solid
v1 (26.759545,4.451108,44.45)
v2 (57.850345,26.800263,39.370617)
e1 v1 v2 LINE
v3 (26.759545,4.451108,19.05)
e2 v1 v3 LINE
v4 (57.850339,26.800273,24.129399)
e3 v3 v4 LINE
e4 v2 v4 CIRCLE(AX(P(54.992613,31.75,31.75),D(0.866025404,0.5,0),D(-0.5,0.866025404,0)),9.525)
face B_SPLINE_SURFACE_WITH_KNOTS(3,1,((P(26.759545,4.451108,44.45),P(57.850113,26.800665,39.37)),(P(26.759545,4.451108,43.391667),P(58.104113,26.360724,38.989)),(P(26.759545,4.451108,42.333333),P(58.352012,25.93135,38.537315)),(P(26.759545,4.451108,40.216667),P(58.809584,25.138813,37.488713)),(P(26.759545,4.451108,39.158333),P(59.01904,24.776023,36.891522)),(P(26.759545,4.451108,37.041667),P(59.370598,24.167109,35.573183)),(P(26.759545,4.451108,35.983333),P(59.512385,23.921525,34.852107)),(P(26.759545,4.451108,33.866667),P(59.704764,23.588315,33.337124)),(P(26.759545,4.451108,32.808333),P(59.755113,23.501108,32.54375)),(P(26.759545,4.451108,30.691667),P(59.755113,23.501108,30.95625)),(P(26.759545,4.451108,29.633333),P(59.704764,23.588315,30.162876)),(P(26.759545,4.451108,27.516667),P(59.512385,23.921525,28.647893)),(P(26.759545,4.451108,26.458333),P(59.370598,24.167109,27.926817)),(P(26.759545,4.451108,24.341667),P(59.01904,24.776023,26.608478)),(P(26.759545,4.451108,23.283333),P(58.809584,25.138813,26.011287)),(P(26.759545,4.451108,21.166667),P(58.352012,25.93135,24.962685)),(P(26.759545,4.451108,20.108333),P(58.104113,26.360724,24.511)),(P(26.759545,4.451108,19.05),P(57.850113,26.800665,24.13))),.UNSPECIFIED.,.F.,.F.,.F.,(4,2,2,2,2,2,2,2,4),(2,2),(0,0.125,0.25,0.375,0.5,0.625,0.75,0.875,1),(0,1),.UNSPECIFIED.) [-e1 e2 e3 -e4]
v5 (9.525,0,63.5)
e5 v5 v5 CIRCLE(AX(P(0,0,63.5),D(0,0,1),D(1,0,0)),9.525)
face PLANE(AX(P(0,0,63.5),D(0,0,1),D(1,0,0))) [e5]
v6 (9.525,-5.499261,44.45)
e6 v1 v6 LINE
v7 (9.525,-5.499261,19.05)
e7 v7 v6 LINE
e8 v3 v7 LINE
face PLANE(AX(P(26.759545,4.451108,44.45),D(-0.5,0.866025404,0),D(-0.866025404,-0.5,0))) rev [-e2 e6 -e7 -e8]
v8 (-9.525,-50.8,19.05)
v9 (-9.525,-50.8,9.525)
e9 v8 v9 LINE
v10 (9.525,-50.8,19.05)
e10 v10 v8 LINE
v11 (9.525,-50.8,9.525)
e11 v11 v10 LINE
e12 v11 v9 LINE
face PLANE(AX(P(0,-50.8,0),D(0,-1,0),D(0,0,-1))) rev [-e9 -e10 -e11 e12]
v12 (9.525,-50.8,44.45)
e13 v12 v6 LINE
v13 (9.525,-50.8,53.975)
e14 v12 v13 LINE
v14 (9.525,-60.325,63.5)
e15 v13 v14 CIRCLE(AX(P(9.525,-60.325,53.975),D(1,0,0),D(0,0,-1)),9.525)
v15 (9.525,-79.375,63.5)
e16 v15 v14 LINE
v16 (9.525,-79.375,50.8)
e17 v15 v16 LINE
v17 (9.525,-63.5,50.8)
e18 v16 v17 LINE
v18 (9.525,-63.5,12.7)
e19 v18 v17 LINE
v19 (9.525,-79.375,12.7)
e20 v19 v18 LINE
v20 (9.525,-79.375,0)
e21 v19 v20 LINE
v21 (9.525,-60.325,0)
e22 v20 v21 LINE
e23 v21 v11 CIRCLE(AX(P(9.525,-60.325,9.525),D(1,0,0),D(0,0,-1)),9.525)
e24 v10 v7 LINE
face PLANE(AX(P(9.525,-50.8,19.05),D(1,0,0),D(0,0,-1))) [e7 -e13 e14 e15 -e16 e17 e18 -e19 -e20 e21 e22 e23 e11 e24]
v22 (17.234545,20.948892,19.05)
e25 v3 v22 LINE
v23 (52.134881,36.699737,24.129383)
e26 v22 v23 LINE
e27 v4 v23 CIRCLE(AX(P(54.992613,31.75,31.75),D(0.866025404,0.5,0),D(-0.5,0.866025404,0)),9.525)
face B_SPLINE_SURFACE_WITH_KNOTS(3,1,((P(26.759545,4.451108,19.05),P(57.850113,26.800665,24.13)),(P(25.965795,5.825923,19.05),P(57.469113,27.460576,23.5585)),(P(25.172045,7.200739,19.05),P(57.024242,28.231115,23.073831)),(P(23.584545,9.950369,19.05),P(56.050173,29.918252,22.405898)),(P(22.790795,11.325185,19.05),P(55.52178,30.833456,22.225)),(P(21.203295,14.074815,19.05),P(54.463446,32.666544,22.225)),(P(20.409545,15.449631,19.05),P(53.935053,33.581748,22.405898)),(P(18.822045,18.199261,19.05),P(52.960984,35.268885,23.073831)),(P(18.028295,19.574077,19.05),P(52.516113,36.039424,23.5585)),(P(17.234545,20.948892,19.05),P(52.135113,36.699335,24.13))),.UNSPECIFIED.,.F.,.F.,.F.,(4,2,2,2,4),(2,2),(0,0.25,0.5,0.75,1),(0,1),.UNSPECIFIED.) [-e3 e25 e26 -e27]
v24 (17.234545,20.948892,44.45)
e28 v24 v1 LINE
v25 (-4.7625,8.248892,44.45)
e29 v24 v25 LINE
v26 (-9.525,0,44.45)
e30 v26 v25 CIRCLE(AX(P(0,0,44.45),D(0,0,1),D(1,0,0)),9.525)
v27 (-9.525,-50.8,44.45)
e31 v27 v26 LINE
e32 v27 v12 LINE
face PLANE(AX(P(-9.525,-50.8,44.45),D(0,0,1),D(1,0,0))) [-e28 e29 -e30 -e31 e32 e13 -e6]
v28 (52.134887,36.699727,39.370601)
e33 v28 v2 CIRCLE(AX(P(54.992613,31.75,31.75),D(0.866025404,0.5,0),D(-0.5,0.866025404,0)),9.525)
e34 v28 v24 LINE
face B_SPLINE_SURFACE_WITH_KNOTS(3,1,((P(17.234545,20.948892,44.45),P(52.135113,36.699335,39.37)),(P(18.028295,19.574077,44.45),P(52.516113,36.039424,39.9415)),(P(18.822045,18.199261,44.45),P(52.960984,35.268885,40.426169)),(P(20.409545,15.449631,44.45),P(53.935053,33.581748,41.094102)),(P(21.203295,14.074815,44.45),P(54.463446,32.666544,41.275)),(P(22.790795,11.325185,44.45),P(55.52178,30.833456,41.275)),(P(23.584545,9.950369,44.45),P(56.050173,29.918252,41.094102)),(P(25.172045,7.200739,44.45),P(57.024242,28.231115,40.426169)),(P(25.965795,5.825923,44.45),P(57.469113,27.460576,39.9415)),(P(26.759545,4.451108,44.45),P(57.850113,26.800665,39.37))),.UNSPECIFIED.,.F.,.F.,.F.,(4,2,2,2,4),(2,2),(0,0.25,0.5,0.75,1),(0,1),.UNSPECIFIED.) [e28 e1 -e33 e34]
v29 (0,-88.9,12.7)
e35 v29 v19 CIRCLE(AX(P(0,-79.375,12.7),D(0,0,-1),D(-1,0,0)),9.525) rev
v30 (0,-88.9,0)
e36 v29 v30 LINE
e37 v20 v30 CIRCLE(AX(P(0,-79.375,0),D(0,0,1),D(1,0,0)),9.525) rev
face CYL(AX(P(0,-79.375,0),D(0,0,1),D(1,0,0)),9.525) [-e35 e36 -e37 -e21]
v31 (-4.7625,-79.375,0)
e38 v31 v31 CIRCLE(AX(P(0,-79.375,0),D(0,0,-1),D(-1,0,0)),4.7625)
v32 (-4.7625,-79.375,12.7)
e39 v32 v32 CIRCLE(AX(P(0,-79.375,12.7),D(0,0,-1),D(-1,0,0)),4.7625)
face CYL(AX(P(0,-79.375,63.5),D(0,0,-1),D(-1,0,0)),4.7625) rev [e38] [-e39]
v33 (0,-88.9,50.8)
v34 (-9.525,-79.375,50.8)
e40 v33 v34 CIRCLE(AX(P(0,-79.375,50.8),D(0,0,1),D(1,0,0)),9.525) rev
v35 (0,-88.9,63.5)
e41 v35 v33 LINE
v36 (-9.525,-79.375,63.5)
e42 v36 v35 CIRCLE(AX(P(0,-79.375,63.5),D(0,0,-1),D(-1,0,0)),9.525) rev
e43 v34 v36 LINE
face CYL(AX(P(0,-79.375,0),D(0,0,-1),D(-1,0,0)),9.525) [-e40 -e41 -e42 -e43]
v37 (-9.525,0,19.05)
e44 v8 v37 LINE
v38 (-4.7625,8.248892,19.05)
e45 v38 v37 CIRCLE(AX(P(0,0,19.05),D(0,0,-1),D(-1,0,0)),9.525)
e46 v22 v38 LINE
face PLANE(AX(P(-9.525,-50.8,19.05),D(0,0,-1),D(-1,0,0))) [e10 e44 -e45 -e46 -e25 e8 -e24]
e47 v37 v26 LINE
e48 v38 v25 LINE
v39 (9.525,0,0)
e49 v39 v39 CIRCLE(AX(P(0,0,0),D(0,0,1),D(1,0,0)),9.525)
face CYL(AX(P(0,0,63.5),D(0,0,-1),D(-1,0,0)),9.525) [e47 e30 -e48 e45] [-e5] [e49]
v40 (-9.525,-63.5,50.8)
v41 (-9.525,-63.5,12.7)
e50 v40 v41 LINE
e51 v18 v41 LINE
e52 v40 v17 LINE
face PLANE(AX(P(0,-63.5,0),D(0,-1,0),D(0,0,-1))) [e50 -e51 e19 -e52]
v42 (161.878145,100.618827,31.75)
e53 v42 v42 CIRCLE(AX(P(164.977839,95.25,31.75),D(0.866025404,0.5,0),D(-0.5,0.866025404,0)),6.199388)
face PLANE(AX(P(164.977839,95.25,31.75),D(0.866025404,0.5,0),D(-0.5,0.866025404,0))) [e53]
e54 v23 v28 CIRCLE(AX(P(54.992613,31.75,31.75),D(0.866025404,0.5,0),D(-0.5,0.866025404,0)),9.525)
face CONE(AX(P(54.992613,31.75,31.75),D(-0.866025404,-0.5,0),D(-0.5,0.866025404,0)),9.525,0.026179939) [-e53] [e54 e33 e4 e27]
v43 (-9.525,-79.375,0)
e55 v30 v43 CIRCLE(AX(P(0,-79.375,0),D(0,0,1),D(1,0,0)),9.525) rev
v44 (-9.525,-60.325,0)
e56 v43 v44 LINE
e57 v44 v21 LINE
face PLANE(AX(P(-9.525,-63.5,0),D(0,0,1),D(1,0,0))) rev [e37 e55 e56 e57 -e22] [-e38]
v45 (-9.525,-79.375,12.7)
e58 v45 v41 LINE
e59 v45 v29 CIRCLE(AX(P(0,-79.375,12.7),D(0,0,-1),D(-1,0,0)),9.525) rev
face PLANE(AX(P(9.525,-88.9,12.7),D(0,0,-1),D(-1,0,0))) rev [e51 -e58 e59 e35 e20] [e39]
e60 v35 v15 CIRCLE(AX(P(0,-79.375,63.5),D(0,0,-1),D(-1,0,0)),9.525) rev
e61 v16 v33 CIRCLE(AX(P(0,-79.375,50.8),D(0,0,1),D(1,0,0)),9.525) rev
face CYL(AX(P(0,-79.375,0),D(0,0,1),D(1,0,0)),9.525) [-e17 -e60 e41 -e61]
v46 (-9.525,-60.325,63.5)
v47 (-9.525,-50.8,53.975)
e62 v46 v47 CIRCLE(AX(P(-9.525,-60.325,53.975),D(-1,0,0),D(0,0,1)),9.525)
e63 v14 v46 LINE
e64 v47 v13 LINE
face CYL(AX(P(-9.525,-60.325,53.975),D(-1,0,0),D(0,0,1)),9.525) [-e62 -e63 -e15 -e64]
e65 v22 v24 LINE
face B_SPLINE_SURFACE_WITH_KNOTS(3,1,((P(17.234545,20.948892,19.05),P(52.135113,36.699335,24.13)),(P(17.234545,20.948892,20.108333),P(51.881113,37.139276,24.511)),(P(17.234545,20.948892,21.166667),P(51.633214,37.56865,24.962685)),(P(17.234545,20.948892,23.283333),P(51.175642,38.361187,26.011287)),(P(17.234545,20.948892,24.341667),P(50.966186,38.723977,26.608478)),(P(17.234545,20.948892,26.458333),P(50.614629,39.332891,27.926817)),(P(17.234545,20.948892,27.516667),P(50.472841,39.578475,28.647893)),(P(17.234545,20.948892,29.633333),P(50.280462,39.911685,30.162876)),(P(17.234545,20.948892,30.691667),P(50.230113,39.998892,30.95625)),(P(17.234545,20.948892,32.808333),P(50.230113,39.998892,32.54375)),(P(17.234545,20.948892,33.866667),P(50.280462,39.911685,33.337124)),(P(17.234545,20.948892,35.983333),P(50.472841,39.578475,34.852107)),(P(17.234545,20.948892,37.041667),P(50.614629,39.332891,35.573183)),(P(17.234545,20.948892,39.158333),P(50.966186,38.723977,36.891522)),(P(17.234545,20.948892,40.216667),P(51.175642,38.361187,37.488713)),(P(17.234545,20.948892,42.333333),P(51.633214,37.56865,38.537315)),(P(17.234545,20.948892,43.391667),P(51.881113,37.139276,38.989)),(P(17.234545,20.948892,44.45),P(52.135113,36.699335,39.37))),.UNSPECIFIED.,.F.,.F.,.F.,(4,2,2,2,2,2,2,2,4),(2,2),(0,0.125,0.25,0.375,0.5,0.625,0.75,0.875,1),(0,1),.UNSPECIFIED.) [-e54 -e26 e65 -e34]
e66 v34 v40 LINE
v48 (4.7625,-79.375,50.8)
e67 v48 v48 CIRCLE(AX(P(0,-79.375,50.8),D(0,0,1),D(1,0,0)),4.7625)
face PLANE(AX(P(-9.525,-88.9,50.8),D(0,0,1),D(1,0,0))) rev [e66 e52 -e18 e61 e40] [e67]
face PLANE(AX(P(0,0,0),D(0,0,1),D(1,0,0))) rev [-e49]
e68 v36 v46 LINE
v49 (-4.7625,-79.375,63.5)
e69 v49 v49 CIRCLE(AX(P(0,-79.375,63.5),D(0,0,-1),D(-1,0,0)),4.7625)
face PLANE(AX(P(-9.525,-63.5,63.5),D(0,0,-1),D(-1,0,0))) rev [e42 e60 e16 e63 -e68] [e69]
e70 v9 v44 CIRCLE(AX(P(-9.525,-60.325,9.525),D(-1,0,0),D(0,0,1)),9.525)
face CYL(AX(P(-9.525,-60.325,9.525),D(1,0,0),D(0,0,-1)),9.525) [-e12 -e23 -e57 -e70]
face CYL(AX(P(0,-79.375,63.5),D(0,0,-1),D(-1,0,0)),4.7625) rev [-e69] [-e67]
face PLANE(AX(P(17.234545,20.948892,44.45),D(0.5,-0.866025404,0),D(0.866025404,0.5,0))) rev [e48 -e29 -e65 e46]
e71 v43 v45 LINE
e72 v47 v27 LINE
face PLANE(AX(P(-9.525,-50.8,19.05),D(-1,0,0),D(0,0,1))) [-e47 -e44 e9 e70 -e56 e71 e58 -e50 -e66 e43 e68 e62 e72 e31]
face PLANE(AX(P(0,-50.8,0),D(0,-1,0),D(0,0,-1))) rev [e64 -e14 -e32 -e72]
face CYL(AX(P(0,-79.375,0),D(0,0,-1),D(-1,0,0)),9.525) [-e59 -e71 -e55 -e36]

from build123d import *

# Parameters (mm, degrees)
SKETCH2_R           = 9.525
BOSS_EXTRUDE1_DEPTH = 63.5
SKETCH3_W           = 19.05
SKETCH3_H           = 25.4
BOSS_EXTRUDE2_DEPTH = 50.8
SKETCH4_W           = 25.4
SKETCH4_H           = 19.05
BOSS_EXTRUDE3_DEPTH = 25.4
SKETCH5_2_R         = 9.525
BOSS_EXTRUDE4_DEPTH = 127
BOSS_EXTRUDE4_TAPER = 1.5
SKETCH8_W           = 19.05
SKETCH8_H           = 63.5
BOSS_EXTRUDE5_DEPTH = 12.7
SKETCH9_W           = 19.05
SKETCH9_H           = 12.7
BOSS_EXTRUDE6_DEPTH = 25.4
FILLET2_R           = 9.525
SKETCH12_R          = 4.7625
CUT_EXTRUDE1_DEPTH  = 206.928278116
FILLET3_R           = 9.525


with BuildPart() as part:
    # Sketch2 → Boss-Extrude1 (new body)
    with BuildSketch(Plane.XY):
        Circle(SKETCH2_R)
    extrude(amount=BOSS_EXTRUDE1_DEPTH)

    # Sketch3 → Boss-Extrude2 (add)
    with BuildSketch(Plane(origin=(0, 0, 0), x_dir=(1, 0, 0), z_dir=(0, 1, 0))):
        with Locations((0, -31.75)):
            Rectangle(SKETCH3_W, SKETCH3_H)
    extrude(amount=-BOSS_EXTRUDE2_DEPTH)

    # Sketch4 → Boss-Extrude3 (add)
    with BuildSketch(Plane(origin=(0, 0, 0), x_dir=(0, 0, -1), z_dir=(0.8660254037844398, 0.499999999999998, 0))):
        with Locations((-31.75, 0)):
            Rectangle(SKETCH4_W, SKETCH4_H)
    extrude(amount=BOSS_EXTRUDE3_DEPTH)

    # Sketch6 → Loft1 section 0
    with BuildSketch(Plane(origin=(21.997045256, 12.7, 0), x_dir=(0, 0, -1), z_dir=(0.8660254037844397, 0.4999999999999981, 0))):
        with BuildLine():
            Line((-44.45, 9.525), (-44.45, -9.525))
            Line((-44.45, -9.525), (-19.05, -9.525))
            Line((-19.05, -9.525), (-19.05, 9.525))
            Line((-19.05, 9.525), (-44.45, 9.525))
        make_face()
    # Sketch5 for Loft1 → Loft1 section 1
    with BuildSketch(Plane(origin=(54.99261314, 31.75, 0), x_dir=(0, 0, -1), z_dir=(0.8660254037844397, 0.4999999999999981, 0))):
        with BuildLine():
            # circular arc as an exact rational Bezier (weights 1, cos(half-angle), 1)
            Bezier((-39.37, 5.715), (-43.65625, 0), (-39.37, -5.715), weights=[1, 0.8, 1])
            Bezier((-39.37, -5.715), (-31.75, -15.875), (-24.13, -5.715), weights=[1, 0.6, 1])
            Bezier((-24.13, -5.715), (-19.84375, 0), (-24.13, 5.715), weights=[1, 0.8, 1])
            Bezier((-24.13, 5.715), (-31.75, 15.875), (-39.37, 5.715), weights=[1, 0.6, 1])
        make_face()
    loft()

    # Sketch5<2> → Boss-Extrude4 (add)
    with BuildSketch(Plane(origin=(54.99261314, 31.75, 0), x_dir=(0, 0, -1), z_dir=(0.8660254037844397, 0.4999999999999981, 0))):
        with Locations((-31.75, 0)):
            Circle(SKETCH5_2_R)
    extrude(amount=BOSS_EXTRUDE4_DEPTH, taper=BOSS_EXTRUDE4_TAPER)

    # Sketch8 → Boss-Extrude5 (add)
    with BuildSketch(Plane.XZ.offset(50.8)):
        with Locations((0, 31.75)):
            Rectangle(SKETCH8_W, SKETCH8_H)
    extrude(amount=BOSS_EXTRUDE5_DEPTH)

    # Sketch9 → Boss-Extrude6 (add)
    with BuildSketch(Plane.XZ.offset(63.5)):
        with Locations((0, 57.15)):
            Rectangle(SKETCH9_W, SKETCH9_H)
        with Locations((0, 6.35)):
            Rectangle(SKETCH9_W, SKETCH9_H)
    extrude(amount=BOSS_EXTRUDE6_DEPTH)

    # Fillet2
    fillet2_edges = [part.edges().sort_by_distance(p)[0] for p in [
        (9.525, -88.9, 6.35),
        (9.525, -88.9, 57.15),
        (-9.525, -88.9, 57.15),
        (-9.525, -88.9, 6.35),
    ]]
    fillet(fillet2_edges, radius=FILLET2_R - 0.0001)  # a hair under: the kernel refuses the full size

    # Sketch12 → Cut-Extrude1 (cut, through all)
    with BuildSketch(Plane(origin=(0, 0, 0), x_dir=(-1, 0, 0), z_dir=(0, 0, -1))):
        with Locations((0, -79.375)):
            Circle(SKETCH12_R)
    extrude(amount=-CUT_EXTRUDE1_DEPTH, mode=Mode.SUBTRACT)

    # Fillet3
    fillet3_edges = [part.edges().sort_by_distance(p)[0] for p in [
        (0, -50.8, 0),
        (0, -50.8, 63.5),
    ]]
    fillet(fillet3_edges, radius=FILLET3_R)


solid = part.part
